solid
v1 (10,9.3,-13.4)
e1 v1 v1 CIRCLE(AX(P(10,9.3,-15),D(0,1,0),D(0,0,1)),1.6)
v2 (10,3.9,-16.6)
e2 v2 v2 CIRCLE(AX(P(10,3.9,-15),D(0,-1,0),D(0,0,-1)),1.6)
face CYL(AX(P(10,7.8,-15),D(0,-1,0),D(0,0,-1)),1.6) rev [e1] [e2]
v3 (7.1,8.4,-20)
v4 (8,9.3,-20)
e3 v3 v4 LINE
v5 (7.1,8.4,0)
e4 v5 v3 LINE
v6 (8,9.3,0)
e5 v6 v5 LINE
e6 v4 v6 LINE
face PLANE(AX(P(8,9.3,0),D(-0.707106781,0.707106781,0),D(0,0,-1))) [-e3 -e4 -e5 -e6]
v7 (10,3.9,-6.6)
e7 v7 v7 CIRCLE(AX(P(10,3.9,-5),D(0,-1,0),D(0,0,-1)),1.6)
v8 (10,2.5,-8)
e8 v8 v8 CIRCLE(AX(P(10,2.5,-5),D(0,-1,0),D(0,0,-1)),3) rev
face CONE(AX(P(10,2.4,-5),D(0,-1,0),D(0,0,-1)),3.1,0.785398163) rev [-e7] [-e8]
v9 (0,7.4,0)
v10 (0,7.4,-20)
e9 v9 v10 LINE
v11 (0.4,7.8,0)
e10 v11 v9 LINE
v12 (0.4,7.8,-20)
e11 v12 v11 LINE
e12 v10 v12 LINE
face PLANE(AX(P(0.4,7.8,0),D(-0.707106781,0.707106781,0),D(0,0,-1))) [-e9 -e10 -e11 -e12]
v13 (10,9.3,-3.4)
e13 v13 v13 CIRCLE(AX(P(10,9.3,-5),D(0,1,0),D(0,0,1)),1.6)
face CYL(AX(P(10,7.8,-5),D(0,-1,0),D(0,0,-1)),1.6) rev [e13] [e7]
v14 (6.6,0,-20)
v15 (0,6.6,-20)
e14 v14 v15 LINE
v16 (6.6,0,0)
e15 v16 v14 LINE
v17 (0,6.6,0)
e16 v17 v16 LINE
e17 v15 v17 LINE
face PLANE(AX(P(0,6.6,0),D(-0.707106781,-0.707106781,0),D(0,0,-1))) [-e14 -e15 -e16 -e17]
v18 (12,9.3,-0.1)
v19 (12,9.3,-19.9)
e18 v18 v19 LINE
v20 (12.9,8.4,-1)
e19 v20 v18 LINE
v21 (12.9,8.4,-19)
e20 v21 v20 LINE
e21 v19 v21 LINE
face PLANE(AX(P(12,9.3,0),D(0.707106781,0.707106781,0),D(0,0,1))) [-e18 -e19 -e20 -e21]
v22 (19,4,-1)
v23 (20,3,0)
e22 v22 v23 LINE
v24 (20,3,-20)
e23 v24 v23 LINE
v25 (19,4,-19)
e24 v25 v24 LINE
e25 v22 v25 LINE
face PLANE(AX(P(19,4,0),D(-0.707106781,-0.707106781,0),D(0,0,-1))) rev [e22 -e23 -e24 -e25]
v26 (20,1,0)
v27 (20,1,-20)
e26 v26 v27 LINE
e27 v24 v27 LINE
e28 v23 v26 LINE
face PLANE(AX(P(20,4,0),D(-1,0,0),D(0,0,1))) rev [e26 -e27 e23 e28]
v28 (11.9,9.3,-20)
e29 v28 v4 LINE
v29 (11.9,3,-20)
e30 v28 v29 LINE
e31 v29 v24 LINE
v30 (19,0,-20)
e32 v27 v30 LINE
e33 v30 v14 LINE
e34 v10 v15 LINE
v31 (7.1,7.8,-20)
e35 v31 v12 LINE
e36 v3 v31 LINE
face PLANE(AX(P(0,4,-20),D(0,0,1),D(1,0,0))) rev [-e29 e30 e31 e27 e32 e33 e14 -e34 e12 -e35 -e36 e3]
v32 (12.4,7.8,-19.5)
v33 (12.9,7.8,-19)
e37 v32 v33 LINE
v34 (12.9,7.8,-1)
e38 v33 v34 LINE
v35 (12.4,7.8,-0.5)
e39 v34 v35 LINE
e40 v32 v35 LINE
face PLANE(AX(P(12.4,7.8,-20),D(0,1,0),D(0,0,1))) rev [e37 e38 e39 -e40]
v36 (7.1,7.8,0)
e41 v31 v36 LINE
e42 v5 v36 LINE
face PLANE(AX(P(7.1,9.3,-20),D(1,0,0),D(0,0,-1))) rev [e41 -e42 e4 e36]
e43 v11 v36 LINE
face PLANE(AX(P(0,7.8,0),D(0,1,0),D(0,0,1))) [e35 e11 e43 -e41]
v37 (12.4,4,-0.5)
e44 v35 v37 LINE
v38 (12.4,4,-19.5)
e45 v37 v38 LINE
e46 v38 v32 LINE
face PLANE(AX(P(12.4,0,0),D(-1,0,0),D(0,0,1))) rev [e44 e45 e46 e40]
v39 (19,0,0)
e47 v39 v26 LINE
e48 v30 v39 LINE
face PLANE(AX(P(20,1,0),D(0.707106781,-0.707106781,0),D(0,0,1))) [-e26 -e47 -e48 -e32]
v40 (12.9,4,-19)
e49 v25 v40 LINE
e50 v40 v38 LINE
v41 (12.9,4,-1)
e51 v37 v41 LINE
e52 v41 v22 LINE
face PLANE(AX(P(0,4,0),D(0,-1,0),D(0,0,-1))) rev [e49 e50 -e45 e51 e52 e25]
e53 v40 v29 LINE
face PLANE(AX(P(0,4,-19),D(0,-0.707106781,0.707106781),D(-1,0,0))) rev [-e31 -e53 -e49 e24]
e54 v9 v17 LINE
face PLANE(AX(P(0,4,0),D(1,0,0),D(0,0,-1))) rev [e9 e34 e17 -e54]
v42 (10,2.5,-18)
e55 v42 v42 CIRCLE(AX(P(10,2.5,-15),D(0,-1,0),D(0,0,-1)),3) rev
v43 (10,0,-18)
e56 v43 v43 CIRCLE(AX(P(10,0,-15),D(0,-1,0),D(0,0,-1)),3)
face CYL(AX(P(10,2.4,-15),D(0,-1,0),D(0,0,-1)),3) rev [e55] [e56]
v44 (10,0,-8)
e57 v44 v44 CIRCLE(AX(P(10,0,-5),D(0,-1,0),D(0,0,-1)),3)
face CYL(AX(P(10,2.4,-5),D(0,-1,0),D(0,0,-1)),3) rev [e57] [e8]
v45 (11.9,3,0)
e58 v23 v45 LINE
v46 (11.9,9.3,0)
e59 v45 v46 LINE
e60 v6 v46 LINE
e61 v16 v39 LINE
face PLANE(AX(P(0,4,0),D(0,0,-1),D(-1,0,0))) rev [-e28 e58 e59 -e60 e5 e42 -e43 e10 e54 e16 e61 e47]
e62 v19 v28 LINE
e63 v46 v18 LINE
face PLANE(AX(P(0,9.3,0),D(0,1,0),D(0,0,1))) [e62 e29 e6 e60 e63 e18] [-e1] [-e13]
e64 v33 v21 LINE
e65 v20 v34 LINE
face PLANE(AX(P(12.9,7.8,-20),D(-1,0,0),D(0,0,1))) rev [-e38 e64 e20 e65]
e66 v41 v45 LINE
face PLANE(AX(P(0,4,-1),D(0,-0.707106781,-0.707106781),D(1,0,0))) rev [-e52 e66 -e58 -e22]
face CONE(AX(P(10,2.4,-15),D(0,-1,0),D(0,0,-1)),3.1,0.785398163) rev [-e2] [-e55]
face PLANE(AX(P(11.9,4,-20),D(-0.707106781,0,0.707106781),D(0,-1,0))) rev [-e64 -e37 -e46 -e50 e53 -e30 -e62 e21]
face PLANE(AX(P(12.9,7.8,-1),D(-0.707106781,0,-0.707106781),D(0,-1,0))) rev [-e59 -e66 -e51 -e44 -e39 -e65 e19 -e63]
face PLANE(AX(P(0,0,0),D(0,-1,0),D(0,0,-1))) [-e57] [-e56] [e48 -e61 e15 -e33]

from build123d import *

# Parameters (mm, degrees)
SKETCH_1_W          = 20
SKETCH_1_H          = 20
EXTRUDE_1_DEPTH     = 4
SKETCH_2_W          = 12.9
SKETCH_2_H          = 20
EXTRUDE_2_DEPTH     = 3.8
SKETCH_3_R          = 1.6
CUT_EXTRUDE_1_DEPTH = 30.340074983
SKETCH_4_W          = 5.8
SKETCH_4_H          = 20
SKETCH_4_R          = 1.6
EXTRUDE_3_DEPTH     = 1.5
SKETCH_5_R          = 3
CUT_EXTRUDE_3_DEPTH = 2.4
CHAMFER_3_SIZE      = 1.5
CHAMFER_1_SIZE      = 6.6
CHAMFER_2_SIZE      = 1
CHAMFER_4_SIZE      = 0.4
CHAMFER_5_SIZE      = 0.9
SKETCH_7_W          = 21.061561739
SKETCH_7_H          = 3.8
CUT_EXTRUDE_6_DEPTH = 0.5


with BuildPart() as part:
    # 草图1 → 凸台-拉伸1 (new body)
    with BuildSketch(Plane(origin=(0, 0, 0), x_dir=(1, 0, 0), z_dir=(0, 1, 0))):
        with Locations((10, 10)):
            Rectangle(SKETCH_1_W, SKETCH_1_H)
    extrude(amount=EXTRUDE_1_DEPTH)

    # 草图2 → 凸台-拉伸2 (add)
    with BuildSketch(Plane(origin=(0, 4, 0), x_dir=(1, 0, 0), z_dir=(0, 1, 0))):
        with Locations((6.45, 10)):
            Rectangle(SKETCH_2_W, SKETCH_2_H)
    extrude(amount=EXTRUDE_2_DEPTH)

    # 草图3 → 切除-拉伸1 (cut, through all)
    with BuildSketch(Plane(origin=(0, 0, 0), x_dir=(-1, 0, 0), z_dir=(0, -1, 0))):
        with Locations(Location((-10, 5, 0), (0, 0, 90))):
            Circle(SKETCH_3_R)
        with Locations(Location((-10, 15, 0), (0, 0, 90))):
            Circle(SKETCH_3_R)
    extrude(amount=-CUT_EXTRUDE_1_DEPTH, mode=Mode.SUBTRACT)

    # 草图4 → 凸台-拉伸3 (add)
    with BuildSketch(Plane(origin=(0, 7.8, 0), x_dir=(1, 0, 0), z_dir=(0, 1, 0))):
        with Locations((10, 10)):
            Rectangle(SKETCH_4_W, SKETCH_4_H)
        with Locations(Location((10, 15, 0), (0, 0, 90))):
            Circle(SKETCH_4_R, mode=Mode.SUBTRACT)
        with Locations(Location((10, 5, 0), (0, 0, 90))):
            Circle(SKETCH_4_R, mode=Mode.SUBTRACT)
    extrude(amount=EXTRUDE_3_DEPTH)

    # 草图5 → 切除-拉伸3 (cut)
    with BuildSketch(Plane(origin=(0, 0, 0), x_dir=(-1, 0, 0), z_dir=(0, -1, 0))):
        with Locations(Location((-10, 5, 0), (0, 0, 90))):
            Circle(SKETCH_5_R)
        with Locations(Location((-10, 15, 0), (0, 0, 90))):
            Circle(SKETCH_5_R)
    extrude(amount=-CUT_EXTRUDE_3_DEPTH, mode=Mode.SUBTRACT)

    # 倒角3
    # the kernel refuses this chamfer: 1.5 mm, written as the material it takes off along each edge
    with BuildSketch(Plane(origin=(10, 2.4, -15), x_dir=(0, 0, -1), z_dir=(-1, 0, 0))) as chamfer_3_piece_1_section:
        Polygon((1.6 + CHAMFER_3_SIZE, 0), (1.6, -CHAMFER_3_SIZE), (1.6, 0), align=None)
    chamfer_3_piece_1 = revolve(axis=Axis((10, 2.4, -15), (0, -1, 0)), mode=Mode.PRIVATE)
    chamfer_3_piece_1 = chamfer_3_piece_1 & Plane(origin=(10, 2.4, -15), x_dir=(0, 0, -1), z_dir=(0, -1, 0)) * Cylinder(3, 13, mode=Mode.PRIVATE)
    add(chamfer_3_piece_1, mode=Mode.SUBTRACT)
    with BuildSketch(Plane(origin=(10, 2.4, -5), x_dir=(0, 0, -1), z_dir=(-1, 0, 0))) as chamfer_3_piece_2_section:
        Polygon((1.6 + CHAMFER_3_SIZE, 0), (1.6, -CHAMFER_3_SIZE), (1.6, 0), align=None)
    chamfer_3_piece_2 = revolve(axis=Axis((10, 2.4, -5), (0, -1, 0)), mode=Mode.PRIVATE)
    chamfer_3_piece_2 = chamfer_3_piece_2 & Plane(origin=(10, 2.4, -5), x_dir=(0, 0, -1), z_dir=(0, -1, 0)) * Cylinder(3, 13, mode=Mode.PRIVATE)
    add(chamfer_3_piece_2, mode=Mode.SUBTRACT)

    # 倒角1
    chamfer_1_edges = [part.edges().sort_by_distance(p)[0] for p in [
        (0, 0, -10),
    ]]
    chamfer(chamfer_1_edges, length=CHAMFER_1_SIZE)

    # 倒角2
    chamfer_2_edges = [part.edges().sort_by_distance(p)[0] for p in [
        (20, 4, -10),
        (16.45, 4, 0),
        (12.9, 6.65, 0),
        (12.9, 6.65, -20),
        (16.45, 4, -20),
        (20, 0, -10),
    ]]
    chamfer(chamfer_2_edges, length=CHAMFER_2_SIZE)

    # 倒角4
    chamfer_4_edges = [part.edges().sort_by_distance(p)[0] for p in [
        (0, 7.8, -10),
    ]]
    chamfer(chamfer_4_edges, length=CHAMFER_4_SIZE)

    # 倒角5
    chamfer_5_edges = [part.edges().sort_by_distance(p)[0] for p in [
        (7.1, 9.3, -10),
        (12.9, 9.3, -10),
    ]]
    chamfer(chamfer_5_edges, length=CHAMFER_5_SIZE)

    # 草图7 → 切除-拉伸6 (cut)
    with BuildSketch(Plane(origin=(12.9, 0, 0), x_dir=(0, 0, -1), z_dir=(1, 0, 0))):
        with Locations((9.469219131, 5.9)):
            Rectangle(SKETCH_7_W, SKETCH_7_H)
    extrude(amount=-CUT_EXTRUDE_6_DEPTH, mode=Mode.SUBTRACT)


solid = part.part
